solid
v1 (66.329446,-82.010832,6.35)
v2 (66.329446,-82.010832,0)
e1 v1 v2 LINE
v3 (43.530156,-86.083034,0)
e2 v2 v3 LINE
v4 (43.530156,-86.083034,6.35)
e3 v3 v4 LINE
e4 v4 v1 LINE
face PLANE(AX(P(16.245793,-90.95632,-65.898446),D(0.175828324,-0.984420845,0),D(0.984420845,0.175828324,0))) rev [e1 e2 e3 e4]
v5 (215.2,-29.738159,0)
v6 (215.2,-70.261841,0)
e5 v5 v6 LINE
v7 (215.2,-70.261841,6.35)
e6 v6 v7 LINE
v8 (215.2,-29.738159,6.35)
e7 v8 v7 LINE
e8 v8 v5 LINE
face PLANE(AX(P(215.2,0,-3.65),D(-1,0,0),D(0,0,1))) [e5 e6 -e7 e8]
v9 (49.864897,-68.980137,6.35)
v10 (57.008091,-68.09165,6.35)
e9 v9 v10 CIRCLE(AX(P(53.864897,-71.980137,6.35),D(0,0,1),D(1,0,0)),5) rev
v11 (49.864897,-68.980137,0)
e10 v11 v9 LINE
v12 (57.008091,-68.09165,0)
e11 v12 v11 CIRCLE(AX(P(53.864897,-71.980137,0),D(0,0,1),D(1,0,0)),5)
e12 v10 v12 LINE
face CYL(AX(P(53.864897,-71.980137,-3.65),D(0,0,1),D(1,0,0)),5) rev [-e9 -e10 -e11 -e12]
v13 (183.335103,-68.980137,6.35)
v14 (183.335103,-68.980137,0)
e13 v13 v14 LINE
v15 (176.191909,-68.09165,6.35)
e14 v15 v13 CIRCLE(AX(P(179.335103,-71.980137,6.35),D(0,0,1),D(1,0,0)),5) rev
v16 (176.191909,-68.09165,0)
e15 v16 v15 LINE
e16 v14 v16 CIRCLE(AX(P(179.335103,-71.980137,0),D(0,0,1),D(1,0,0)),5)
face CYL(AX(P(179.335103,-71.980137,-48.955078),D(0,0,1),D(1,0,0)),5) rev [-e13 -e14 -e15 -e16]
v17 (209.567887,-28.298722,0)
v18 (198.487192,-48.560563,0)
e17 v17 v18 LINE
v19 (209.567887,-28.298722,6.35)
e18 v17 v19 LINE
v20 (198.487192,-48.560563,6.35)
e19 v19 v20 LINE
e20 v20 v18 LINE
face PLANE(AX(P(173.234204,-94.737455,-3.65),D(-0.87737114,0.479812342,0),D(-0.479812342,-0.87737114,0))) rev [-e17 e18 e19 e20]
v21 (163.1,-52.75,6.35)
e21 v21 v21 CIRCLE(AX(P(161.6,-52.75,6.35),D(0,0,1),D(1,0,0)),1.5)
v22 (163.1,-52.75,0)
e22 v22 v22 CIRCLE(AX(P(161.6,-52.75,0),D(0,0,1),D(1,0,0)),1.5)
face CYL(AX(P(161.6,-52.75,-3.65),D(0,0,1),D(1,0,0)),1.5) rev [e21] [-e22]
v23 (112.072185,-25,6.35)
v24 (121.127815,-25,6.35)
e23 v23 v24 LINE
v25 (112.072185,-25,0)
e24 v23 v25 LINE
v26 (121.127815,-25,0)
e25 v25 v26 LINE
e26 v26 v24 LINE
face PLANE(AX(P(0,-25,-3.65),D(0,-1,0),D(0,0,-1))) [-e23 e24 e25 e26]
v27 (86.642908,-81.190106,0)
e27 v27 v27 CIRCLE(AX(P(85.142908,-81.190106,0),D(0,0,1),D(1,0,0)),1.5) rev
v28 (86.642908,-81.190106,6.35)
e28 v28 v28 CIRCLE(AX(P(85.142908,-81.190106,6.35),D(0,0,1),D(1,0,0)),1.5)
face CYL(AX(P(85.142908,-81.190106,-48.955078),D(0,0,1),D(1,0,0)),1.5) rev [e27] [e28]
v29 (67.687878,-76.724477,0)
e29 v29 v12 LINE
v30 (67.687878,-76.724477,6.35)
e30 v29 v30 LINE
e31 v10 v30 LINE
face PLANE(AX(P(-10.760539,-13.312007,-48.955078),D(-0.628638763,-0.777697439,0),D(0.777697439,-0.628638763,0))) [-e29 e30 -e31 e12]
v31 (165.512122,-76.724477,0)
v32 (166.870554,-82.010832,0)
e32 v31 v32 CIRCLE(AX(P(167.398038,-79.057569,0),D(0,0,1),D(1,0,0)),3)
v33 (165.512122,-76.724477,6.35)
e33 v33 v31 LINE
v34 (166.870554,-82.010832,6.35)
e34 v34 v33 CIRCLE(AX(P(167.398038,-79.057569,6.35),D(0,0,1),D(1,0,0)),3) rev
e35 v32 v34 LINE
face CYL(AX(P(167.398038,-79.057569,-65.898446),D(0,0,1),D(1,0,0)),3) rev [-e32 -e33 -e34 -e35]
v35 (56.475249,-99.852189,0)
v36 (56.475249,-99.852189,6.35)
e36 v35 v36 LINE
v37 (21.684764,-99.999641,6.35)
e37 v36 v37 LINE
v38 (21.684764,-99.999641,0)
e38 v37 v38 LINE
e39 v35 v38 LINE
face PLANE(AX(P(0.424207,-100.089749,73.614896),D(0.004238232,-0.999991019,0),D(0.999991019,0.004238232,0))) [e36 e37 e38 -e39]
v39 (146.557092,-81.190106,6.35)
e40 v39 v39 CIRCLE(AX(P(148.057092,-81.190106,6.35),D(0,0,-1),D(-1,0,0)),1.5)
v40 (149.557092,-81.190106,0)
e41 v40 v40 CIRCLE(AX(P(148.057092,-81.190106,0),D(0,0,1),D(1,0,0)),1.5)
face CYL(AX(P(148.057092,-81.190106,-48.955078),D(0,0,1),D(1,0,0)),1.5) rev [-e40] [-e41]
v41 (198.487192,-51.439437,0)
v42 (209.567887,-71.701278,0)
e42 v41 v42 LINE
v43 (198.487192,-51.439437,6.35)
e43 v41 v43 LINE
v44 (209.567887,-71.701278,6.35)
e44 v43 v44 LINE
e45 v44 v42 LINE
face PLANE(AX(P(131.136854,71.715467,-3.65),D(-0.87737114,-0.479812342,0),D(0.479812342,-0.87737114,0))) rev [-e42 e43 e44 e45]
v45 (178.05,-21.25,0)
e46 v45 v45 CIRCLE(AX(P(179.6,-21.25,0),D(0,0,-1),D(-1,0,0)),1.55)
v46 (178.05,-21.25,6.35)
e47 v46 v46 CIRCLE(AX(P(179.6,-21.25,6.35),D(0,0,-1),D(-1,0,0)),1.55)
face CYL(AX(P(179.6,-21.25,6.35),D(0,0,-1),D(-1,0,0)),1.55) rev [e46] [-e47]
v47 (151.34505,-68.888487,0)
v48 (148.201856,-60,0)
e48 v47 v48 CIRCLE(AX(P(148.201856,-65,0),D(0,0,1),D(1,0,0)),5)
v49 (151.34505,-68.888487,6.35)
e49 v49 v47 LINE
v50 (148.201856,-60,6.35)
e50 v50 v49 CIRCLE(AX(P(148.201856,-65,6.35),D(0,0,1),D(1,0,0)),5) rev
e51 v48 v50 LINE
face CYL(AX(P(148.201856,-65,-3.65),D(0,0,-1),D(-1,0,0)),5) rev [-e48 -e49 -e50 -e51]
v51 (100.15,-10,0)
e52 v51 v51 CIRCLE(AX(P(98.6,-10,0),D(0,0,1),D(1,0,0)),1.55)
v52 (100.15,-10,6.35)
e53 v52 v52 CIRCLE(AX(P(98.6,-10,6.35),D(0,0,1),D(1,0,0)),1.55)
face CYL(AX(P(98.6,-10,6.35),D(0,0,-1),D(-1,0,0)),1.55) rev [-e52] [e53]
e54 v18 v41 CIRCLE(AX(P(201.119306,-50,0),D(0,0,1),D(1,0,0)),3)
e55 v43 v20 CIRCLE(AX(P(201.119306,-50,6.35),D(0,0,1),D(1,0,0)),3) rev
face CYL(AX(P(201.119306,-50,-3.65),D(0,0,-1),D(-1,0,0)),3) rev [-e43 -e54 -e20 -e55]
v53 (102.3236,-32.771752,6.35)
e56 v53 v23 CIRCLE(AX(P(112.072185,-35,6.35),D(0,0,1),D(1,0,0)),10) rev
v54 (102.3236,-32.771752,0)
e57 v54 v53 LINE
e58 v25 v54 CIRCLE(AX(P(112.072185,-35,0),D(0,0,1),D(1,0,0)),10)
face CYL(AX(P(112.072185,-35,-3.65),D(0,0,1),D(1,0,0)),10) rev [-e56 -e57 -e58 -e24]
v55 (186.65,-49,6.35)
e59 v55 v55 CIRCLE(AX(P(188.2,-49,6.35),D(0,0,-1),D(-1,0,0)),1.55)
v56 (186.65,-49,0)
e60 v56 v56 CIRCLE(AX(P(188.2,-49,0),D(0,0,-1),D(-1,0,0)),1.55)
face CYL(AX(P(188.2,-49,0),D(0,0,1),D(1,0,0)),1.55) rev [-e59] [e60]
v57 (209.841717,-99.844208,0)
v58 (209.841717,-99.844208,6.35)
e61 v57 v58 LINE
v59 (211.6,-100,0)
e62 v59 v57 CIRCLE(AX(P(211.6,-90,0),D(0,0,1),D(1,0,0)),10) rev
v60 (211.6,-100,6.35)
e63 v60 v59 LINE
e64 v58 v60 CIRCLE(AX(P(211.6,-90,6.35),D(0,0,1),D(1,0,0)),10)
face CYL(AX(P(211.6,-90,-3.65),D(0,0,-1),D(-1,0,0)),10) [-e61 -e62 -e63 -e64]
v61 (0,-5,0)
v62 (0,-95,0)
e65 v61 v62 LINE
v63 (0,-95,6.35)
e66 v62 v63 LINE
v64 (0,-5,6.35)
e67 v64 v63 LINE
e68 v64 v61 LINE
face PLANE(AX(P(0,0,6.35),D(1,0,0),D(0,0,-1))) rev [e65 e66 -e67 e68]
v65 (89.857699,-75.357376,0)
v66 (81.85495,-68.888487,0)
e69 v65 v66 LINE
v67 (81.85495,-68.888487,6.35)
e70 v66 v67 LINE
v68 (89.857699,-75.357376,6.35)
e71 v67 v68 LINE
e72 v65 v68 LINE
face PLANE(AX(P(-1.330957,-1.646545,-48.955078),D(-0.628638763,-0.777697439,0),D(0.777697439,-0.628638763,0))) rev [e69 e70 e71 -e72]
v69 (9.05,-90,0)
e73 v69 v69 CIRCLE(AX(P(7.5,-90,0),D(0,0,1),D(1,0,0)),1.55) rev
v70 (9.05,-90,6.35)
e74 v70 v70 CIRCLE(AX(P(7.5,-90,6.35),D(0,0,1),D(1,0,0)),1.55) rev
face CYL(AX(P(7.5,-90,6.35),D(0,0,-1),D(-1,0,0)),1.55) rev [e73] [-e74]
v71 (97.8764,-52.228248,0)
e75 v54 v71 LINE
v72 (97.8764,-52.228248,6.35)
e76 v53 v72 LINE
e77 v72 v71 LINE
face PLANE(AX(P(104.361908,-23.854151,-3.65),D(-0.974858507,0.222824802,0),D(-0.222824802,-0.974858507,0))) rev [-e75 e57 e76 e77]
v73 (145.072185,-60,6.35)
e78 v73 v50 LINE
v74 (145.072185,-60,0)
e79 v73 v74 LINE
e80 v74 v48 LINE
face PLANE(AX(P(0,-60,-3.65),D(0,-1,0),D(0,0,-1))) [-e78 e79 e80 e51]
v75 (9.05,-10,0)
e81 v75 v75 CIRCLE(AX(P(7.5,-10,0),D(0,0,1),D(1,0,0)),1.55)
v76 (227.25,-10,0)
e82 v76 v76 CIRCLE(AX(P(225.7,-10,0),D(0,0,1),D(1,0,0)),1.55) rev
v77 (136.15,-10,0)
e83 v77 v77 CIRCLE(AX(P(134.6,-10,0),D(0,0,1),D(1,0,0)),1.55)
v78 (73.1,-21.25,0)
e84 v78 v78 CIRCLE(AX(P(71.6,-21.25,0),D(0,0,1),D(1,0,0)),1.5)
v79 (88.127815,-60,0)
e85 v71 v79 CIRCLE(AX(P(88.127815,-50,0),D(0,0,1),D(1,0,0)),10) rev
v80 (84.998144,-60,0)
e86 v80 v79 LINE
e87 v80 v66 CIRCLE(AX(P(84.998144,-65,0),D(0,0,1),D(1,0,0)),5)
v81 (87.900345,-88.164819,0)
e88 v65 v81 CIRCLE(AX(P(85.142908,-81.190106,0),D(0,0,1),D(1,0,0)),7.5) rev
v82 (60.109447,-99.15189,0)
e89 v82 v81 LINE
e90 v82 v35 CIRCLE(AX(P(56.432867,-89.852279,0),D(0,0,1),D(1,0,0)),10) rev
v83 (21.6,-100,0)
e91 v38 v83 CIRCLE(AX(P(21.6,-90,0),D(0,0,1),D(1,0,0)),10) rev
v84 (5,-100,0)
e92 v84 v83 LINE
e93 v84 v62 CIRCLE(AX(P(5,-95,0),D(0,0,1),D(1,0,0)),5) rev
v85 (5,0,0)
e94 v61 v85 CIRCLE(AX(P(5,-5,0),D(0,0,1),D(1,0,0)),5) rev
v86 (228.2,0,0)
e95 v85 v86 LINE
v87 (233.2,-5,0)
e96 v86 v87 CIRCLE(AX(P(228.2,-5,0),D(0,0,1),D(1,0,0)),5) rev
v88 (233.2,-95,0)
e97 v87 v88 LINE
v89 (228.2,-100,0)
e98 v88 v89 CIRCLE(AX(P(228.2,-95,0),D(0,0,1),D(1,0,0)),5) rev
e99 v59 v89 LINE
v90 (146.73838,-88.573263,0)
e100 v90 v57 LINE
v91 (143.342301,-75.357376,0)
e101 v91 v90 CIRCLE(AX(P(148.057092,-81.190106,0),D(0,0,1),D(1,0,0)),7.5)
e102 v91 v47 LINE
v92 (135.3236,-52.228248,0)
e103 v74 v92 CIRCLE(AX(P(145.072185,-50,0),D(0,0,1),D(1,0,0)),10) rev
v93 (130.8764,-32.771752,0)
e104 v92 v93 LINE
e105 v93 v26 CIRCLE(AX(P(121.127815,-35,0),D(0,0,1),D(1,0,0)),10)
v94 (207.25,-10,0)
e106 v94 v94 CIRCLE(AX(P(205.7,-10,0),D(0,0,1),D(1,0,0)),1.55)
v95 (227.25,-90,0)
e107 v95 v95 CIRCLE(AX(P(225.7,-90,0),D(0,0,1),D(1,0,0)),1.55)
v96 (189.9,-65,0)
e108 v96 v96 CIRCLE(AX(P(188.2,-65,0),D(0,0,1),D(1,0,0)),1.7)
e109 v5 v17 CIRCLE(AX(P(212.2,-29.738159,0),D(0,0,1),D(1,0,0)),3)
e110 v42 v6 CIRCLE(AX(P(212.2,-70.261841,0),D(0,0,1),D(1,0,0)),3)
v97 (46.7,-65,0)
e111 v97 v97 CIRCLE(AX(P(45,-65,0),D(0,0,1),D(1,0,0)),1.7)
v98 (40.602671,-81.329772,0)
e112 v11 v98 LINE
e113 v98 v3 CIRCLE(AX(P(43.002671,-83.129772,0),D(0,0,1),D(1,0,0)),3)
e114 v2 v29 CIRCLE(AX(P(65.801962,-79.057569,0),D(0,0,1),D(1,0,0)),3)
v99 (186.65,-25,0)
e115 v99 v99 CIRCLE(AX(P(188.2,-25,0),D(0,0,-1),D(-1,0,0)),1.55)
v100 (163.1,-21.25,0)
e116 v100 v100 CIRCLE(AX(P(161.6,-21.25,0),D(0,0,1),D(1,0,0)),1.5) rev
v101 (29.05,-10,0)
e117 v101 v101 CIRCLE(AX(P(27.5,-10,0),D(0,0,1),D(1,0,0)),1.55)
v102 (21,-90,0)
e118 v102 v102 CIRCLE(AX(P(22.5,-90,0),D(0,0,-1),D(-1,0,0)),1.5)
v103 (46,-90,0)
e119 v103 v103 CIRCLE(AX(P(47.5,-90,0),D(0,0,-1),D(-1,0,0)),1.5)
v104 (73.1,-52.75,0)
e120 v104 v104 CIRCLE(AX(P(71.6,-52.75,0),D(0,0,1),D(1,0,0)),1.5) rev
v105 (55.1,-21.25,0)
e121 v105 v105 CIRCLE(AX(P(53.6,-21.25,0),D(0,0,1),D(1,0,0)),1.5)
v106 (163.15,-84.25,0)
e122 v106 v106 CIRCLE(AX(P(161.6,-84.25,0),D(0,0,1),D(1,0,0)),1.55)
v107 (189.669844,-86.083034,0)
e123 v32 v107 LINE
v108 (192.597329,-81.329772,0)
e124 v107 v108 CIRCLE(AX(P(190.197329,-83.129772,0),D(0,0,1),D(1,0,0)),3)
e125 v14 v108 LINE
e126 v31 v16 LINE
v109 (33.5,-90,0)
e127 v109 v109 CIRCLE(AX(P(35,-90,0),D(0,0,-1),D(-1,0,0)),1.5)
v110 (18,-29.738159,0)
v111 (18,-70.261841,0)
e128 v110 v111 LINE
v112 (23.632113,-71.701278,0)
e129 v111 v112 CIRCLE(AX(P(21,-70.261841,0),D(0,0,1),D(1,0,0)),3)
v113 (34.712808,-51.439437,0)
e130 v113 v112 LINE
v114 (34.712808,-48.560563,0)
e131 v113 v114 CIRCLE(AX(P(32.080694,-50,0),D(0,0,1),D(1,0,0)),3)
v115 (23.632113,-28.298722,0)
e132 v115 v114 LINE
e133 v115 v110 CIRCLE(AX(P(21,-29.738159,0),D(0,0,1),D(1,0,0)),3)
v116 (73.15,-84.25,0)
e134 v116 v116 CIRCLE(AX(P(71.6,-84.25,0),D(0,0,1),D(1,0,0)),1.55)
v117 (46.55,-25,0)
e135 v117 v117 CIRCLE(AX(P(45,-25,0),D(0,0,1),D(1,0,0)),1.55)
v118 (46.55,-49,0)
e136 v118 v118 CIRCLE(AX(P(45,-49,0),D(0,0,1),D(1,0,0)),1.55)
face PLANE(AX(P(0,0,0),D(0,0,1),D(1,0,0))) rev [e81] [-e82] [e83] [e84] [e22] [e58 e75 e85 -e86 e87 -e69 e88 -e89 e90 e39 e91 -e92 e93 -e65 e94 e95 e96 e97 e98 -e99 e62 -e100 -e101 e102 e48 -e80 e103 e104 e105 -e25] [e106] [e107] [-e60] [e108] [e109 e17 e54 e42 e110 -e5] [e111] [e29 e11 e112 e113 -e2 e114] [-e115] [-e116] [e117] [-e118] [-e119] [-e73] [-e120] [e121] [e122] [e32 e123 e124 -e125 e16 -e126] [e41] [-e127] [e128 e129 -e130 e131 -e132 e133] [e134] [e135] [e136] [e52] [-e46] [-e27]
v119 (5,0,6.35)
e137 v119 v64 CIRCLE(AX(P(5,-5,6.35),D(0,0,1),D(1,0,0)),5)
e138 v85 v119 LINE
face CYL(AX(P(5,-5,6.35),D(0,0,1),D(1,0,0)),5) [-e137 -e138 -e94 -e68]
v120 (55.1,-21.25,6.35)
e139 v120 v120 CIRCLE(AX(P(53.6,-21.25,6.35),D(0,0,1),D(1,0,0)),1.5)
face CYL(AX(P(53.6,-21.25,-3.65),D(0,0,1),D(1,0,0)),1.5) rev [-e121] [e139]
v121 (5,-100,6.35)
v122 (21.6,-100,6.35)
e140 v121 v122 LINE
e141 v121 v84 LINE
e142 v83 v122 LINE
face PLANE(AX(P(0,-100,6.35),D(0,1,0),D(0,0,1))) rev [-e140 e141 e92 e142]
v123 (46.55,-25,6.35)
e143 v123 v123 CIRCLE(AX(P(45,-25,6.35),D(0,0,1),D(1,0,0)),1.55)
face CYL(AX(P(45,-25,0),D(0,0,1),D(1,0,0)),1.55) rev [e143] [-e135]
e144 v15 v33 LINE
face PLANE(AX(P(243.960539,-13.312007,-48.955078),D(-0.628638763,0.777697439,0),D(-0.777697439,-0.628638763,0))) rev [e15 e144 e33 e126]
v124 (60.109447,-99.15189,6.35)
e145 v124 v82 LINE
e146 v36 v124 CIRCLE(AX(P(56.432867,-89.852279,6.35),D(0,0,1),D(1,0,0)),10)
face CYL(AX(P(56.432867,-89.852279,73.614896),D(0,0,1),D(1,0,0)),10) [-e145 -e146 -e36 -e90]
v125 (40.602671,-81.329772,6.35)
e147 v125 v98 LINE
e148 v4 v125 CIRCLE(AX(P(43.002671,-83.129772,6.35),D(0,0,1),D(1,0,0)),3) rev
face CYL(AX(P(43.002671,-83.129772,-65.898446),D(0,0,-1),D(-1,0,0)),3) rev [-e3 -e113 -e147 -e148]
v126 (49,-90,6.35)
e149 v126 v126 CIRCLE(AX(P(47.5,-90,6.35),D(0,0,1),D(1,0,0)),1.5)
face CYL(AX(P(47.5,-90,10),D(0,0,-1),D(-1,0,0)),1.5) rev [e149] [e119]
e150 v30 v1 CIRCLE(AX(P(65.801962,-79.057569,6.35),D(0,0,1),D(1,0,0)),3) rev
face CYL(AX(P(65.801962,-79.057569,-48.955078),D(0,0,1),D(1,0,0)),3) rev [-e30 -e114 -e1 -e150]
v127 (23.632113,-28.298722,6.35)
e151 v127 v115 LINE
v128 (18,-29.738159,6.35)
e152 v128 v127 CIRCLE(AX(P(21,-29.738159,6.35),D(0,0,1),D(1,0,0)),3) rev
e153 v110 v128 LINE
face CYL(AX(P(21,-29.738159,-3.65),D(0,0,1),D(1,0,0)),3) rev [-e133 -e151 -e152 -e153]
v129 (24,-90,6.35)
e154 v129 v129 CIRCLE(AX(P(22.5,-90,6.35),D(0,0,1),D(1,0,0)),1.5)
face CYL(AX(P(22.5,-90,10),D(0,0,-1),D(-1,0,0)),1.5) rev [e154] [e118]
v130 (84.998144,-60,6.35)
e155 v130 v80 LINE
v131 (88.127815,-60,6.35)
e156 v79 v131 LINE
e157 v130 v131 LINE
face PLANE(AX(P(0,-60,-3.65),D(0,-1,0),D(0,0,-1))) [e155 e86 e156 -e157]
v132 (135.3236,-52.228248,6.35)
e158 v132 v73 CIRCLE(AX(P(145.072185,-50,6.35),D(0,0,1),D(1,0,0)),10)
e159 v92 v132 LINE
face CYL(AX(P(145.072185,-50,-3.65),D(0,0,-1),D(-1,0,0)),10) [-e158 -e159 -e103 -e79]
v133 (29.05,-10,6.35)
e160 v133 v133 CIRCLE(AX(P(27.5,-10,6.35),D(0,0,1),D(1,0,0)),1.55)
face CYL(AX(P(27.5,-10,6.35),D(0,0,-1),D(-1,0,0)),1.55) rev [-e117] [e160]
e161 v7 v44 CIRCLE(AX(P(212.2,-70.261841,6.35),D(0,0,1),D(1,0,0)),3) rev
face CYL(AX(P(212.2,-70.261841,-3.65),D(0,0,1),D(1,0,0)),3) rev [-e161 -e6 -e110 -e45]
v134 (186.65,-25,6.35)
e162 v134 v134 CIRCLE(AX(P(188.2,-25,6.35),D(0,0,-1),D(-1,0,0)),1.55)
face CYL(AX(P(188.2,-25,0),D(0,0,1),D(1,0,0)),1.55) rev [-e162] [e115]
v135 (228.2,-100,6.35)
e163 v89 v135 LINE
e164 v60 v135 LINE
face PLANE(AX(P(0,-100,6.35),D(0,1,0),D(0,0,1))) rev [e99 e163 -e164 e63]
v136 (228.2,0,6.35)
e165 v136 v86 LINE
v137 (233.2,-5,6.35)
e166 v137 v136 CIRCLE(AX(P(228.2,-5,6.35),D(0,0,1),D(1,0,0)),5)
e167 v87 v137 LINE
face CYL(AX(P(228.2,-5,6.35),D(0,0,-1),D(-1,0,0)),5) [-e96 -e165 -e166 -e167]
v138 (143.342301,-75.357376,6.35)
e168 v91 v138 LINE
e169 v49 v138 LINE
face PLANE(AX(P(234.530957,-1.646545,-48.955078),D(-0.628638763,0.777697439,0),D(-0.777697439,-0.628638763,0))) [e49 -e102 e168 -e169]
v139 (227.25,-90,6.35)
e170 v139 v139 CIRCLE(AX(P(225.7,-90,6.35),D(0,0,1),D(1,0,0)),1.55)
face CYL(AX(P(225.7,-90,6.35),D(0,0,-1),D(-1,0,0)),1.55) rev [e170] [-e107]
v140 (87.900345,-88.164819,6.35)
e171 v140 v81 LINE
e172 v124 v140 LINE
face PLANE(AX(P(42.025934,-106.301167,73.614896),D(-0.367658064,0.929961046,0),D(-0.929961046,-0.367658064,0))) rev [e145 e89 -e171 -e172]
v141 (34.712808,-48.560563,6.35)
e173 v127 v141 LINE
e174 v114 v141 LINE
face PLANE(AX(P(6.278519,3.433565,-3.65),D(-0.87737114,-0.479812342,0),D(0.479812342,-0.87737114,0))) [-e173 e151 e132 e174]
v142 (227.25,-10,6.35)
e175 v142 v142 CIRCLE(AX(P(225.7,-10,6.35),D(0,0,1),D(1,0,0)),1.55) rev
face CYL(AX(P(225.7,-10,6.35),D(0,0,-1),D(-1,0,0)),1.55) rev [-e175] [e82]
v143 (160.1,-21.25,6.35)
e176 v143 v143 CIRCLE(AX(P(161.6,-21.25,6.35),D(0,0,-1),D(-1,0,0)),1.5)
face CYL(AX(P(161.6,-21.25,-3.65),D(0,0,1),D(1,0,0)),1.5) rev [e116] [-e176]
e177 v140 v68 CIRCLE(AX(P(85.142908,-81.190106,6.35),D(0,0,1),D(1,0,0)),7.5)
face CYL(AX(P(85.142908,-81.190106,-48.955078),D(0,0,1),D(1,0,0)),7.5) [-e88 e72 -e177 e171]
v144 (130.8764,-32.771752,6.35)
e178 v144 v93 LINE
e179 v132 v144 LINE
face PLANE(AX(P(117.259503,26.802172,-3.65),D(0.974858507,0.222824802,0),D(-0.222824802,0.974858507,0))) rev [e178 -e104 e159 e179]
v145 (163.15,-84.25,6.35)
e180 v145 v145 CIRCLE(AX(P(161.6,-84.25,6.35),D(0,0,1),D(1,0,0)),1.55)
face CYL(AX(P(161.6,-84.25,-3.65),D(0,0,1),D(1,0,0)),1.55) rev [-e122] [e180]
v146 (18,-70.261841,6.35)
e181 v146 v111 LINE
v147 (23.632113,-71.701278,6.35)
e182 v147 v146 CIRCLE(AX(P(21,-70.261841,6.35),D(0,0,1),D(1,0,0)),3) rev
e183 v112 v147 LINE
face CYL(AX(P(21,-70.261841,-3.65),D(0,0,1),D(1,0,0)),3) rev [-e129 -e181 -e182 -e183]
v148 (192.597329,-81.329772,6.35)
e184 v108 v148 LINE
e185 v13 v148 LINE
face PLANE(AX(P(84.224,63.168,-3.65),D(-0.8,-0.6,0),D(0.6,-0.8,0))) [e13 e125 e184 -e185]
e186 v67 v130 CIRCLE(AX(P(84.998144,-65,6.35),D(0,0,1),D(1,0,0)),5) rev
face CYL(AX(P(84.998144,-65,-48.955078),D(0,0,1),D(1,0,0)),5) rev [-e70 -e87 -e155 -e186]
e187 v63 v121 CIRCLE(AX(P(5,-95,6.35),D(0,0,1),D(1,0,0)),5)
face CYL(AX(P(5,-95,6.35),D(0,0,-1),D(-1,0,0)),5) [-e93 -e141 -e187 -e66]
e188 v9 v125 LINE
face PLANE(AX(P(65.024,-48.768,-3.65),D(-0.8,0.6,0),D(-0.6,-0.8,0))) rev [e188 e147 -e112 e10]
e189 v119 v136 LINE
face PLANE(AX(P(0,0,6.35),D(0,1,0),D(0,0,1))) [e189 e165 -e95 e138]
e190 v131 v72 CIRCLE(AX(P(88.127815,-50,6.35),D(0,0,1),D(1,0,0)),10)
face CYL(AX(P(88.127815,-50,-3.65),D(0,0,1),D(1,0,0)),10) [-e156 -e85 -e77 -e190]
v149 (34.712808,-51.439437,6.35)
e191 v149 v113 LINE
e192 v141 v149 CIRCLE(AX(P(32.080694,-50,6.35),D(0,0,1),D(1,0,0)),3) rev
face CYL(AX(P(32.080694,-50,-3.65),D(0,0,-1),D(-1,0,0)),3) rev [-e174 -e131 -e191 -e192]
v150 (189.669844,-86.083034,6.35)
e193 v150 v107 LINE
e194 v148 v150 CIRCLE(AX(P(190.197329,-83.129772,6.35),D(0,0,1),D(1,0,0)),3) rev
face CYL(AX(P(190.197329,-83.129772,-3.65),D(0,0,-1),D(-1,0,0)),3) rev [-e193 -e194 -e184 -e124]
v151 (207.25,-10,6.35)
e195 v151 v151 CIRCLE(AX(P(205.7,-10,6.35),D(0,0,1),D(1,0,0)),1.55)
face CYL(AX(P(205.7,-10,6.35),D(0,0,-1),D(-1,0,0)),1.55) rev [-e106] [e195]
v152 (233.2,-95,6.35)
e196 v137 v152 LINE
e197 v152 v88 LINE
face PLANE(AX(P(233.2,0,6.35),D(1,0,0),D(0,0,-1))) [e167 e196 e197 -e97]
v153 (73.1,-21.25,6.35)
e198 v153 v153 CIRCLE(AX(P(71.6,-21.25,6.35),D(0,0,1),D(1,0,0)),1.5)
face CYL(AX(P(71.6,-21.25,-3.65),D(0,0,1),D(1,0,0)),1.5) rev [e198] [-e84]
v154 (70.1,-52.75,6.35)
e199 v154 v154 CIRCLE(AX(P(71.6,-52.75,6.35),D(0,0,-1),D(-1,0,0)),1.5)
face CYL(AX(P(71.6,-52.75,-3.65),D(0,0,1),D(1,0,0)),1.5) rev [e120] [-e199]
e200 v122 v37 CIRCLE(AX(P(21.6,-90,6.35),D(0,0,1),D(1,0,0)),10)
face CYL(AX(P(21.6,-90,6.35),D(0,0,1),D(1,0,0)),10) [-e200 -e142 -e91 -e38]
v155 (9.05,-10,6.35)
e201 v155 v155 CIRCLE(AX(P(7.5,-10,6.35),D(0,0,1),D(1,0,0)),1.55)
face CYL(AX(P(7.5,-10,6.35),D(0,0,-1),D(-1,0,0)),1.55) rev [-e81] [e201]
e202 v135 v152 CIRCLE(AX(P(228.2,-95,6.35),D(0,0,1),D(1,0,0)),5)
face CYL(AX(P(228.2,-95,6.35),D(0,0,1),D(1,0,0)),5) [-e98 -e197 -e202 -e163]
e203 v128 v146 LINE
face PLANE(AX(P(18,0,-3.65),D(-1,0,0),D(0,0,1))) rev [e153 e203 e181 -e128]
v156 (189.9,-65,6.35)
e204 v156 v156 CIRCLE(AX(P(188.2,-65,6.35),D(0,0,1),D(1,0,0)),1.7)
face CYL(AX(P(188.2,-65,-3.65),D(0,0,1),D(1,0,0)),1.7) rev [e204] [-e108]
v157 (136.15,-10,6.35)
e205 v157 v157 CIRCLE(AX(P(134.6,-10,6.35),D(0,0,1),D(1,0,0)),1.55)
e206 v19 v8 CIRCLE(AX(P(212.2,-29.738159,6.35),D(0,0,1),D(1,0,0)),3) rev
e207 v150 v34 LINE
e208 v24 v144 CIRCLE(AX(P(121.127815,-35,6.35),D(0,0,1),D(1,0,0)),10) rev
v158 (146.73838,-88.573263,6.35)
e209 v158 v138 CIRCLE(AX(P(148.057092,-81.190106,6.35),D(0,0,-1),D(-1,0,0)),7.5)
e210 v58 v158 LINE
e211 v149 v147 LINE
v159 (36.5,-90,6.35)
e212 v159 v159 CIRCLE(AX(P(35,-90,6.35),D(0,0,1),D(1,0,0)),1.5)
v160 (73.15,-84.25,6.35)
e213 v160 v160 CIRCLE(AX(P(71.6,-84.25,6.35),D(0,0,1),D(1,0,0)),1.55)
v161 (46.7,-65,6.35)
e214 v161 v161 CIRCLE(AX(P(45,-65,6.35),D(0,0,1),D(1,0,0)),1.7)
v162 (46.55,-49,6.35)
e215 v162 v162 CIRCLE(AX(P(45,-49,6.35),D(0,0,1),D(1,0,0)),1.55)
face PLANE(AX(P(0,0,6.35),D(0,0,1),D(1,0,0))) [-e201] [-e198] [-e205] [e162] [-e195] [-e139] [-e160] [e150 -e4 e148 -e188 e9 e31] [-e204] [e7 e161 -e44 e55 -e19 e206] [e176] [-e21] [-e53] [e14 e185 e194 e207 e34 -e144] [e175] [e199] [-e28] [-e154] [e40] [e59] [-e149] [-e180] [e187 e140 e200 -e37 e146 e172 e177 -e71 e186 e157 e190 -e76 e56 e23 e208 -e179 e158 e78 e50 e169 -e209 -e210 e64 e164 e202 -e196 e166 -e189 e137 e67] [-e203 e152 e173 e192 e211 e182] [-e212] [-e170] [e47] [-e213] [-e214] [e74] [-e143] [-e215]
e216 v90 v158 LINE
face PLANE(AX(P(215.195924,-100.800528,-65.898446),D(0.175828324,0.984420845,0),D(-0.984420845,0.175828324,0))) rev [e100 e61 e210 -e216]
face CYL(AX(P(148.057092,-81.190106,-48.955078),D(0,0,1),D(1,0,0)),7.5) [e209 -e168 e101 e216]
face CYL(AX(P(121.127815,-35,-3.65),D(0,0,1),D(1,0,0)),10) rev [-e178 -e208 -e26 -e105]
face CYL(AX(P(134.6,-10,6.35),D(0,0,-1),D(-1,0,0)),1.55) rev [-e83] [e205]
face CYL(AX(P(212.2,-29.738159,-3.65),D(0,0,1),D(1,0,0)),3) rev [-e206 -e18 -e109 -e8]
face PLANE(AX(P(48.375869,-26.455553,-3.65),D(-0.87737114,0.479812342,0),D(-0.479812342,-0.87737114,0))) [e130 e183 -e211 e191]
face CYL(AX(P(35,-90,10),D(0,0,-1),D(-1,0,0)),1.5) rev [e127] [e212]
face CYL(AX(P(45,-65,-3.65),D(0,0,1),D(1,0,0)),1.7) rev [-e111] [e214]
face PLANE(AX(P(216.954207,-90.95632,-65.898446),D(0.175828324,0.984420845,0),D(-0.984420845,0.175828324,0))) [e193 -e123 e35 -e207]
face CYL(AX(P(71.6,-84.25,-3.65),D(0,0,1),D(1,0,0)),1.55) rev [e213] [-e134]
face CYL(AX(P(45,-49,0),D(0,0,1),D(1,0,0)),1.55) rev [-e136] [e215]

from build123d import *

# Parameters (mm, degrees)
SKETCH1_W           = 233.2
SKETCH1_H           = 100
SKETCH1_R           = 1.55
BOSS_EXTRUDE1_DEPTH = 6.35
FILLET1_R           = 5
SKETCH2_R           = 1.55
CUT_EXTRUDE1_DEPTH  = 6.35
SKETCH3_W           = 10
SKETCH3_H           = 12.7
BOSS_EXTRUDE2_DEPTH = 6.35
FILLET2_R           = 5
FILLET3_R           = 10
FILLET4_R           = 2
FILLET5_R           = 20
FILLET6_R           = 5
CUT_EXTRUDE2_DEPTH  = 10
SKETCH5_W           = 120
SKETCH5_H           = 40
CUT_EXTRUDE4_DEPTH  = 10
SKETCH6_R           = 1.5
CUT_EXTRUDE5_DEPTH  = 10
FILLET7_R           = 10
SKETCH7_W           = 25
SKETCH7_H           = 35
CUT_EXTRUDE6_DEPTH  = 10
FILLET9_R           = 10
SKETCH8_R           = 1.5
CUT_EXTRUDE7_DEPTH  = 10
BOSS_EXTRUDE3_START = -6.35
BOSS_EXTRUDE3_DEPTH = 6.35
FILLET10_R          = 5
BOSS_EXTRUDE4_START = -6.35
BOSS_EXTRUDE4_DEPTH = 6.35
FILLET11_R          = 3
FILLET12_R          = 3
CUT_EXTRUDE8_DEPTH  = 10
FILLET13_R          = 3
CUT_EXTRUDE9_DEPTH  = 10
SKETCH13_R          = 1.55
CUT_EXTRUDE10_DEPTH = 10
SKETCH14_R          = 1.5
CUT_EXTRUDE11_DEPTH = 10
BOSS_EXTRUDE5_START = -6.35
BOSS_EXTRUDE5_DEPTH = 6.35
FILLET14_R          = 10
SKETCH15_R          = 1.55
CUT_EXTRUDE12_DEPTH = 254.816001269


# Read off the part's stored shape, not the designer's step: Boss-Extrude5
with BuildPart() as part:
    # Sketch1 → Boss-Extrude1 (new body)
    with BuildSketch(Plane.XY):
        with Locations((116.6, -50)):
            Rectangle(SKETCH1_W, SKETCH1_H)
        with Locations((7.5, -10)):
            Circle(SKETCH1_R, mode=Mode.SUBTRACT)
        with Locations((225.7, -10)):
            Circle(SKETCH1_R, mode=Mode.SUBTRACT)
        with Locations((7.5, -90)):
            Circle(SKETCH1_R, mode=Mode.SUBTRACT)
        with Locations((225.7, -90)):
            Circle(SKETCH1_R, mode=Mode.SUBTRACT)
        with Locations((27.5, -10)):
            Circle(SKETCH1_R, mode=Mode.SUBTRACT)
        with Locations((205.7, -10)):
            Circle(SKETCH1_R, mode=Mode.SUBTRACT)
        with Locations((134.6, -10)):
            Circle(SKETCH1_R, mode=Mode.SUBTRACT)
        with Locations((98.6, -10)):
            Circle(SKETCH1_R, mode=Mode.SUBTRACT)
    extrude(amount=BOSS_EXTRUDE1_DEPTH)

    # Fillet1
    fillet1_edges = [part.edges().sort_by_distance(p)[0] for p in [
        (233.2, -100, 3.175),
        (0, -100, 3.175),
        (0, 0, 3.175),
        (233.2, 0, 3.175),
    ]]
    fillet(fillet1_edges, radius=FILLET1_R)

    # Sketch2 → Cut-Extrude1 (cut)
    with BuildSketch(Plane.XY.offset(6.35)):
        with Locations((45, -25)):
            Circle(SKETCH2_R)
        with Locations((45, -49)):
            Circle(SKETCH2_R)
        with Locations(Location((188.2, -49, 0), (0, 0, 180))):
            Circle(SKETCH2_R)
        with Locations(Location((188.2, -25, 0), (0, 0, 180))):
            Circle(SKETCH2_R)
    extrude(amount=-CUT_EXTRUDE1_DEPTH, mode=Mode.SUBTRACT)

    # Sketch3 → Boss-Extrude2 (add)
    with BuildSketch(Plane.XY.offset(6.35)):
        with Locations((125.723568259, 6.35)):
            Rectangle(SKETCH3_W, SKETCH3_H)
        Polygon((120.723568259, 16.7), (120.723568259, 12.7), (130.723568259, 12.7), (130.723568259, 24.7), (85.723568259, 24.7), (85.723568259, 12.7), (95.723568259, 12.7), (95.723568259, 16.7), align=None)
        Polygon((130.723568259, 12.7), (130.723568259, 0), (152.313568259, 0), (130.723568259, 24.7), align=None)
    extrude(amount=-BOSS_EXTRUDE2_DEPTH)

    # Fillet2
    fillet2_edges = [part.edges().sort_by_distance(p)[0] for p in [
        (85.723568259, 12.7, 3.175),
    ]]
    fillet(fillet2_edges, radius=FILLET2_R)

    # Fillet3
    fillet3_edges = [part.edges().sort_by_distance(p)[0] for p in [
        (120.723568259, 0, 3.175),
    ]]
    fillet(fillet3_edges, radius=FILLET3_R)

    # Fillet4
    fillet4_edges = [part.edges().sort_by_distance(p)[0] for p in [
        (85.723568259, 24.7, 3.175),
    ]]
    fillet(fillet4_edges, radius=FILLET4_R)

    # Fillet5
    fillet5_edges = [part.edges().sort_by_distance(p)[0] for p in [
        (130.723568259, 24.7, 3.175),
        (152.313568259, 0, 3.175),
    ]]
    fillet(fillet5_edges, radius=FILLET5_R)

    # Fillet6
    fillet6_edges = [part.edges().sort_by_distance(p)[0] for p in [
        (120.723568259, 16.7, 3.175),
    ]]
    fillet(fillet6_edges, radius=FILLET6_R)

    # Sketch4 → Cut-Extrude2 (cut)
    with BuildSketch(Plane(origin=(0, 0, 0), x_dir=(-1, 0, 0), z_dir=(0, 0, -1))):
        with BuildLine():
            Line((-110.723568259, 0), (-161.395157905, 0))
            ThreePointArc((-161.395157905, 0), (-153.126132222, 1.789475179), (-146.33682816, 6.837678575))
            Line((-146.33682816, 6.837678575), (-136.700308357, 17.862321425))
            ThreePointArc((-136.700308357, 17.862321425), (-129.911004296, 22.910524821), (-121.641978613, 24.7))
            Line((-121.641978613, 24.7), (-87.723568259, 24.7))
            ThreePointArc((-87.723568259, 24.7), (-86.309354696, 24.114213562), (-85.723568259, 22.7))
            Line((-85.723568259, 22.7), (-85.723568259, 17.7))
            ThreePointArc((-85.723568259, 17.7), (-87.188034353, 14.164466094), (-90.723568259, 12.7))
            Line((-90.723568259, 12.7), (-95.723568259, 12.7))
            Line((-95.723568259, 12.7), (-95.723568259, 16.7))
            Line((-95.723568259, 16.7), (-115.723568259, 16.7))
            ThreePointArc((-115.723568259, 16.7), (-119.259102165, 15.235533906), (-120.723568259, 11.7))
            Line((-120.723568259, 11.7), (-120.723568259, 10))
            ThreePointArc((-120.723568259, 10), (-117.794636071, 2.928932188), (-110.723568259, 0))
        make_face()
    extrude(amount=-CUT_EXTRUDE2_DEPTH, mode=Mode.SUBTRACT)

    # Sketch5 → Cut-Extrude4 (cut)
    with BuildSketch(Plane.XY.offset(6.35)):
        Polygon((56.6, -100), (56.6, -60), (26.6, -100), align=None)
        with Locations((116.6, -80)):
            Rectangle(SKETCH5_W, SKETCH5_H)
        Polygon((206.6, -100), (176.6, -60), (176.6, -100), align=None)
    extrude(amount=-CUT_EXTRUDE4_DEPTH, mode=Mode.SUBTRACT)

    # Sketch6 → Cut-Extrude5 (cut)
    with BuildSketch(Plane.XY.offset(6.35)):
        with Locations((71.6, -21.25)):
            Circle(SKETCH6_R)
        with Locations((161.6, -21.25)):
            Circle(SKETCH6_R)
        with Locations((161.6, -52.75)):
            Circle(SKETCH6_R)
        with Locations((71.6, -52.75)):
            Circle(SKETCH6_R)
    extrude(amount=-CUT_EXTRUDE5_DEPTH, mode=Mode.SUBTRACT)

    # Fillet7
    fillet7_edges = [part.edges().sort_by_distance(p)[0] for p in [
        (206.6, -100, 3.175),
        (26.6, -100, 3.175),
        (56.6, -60, 3.175),
        (176.6, -60, 3.175),
    ]]
    fillet(fillet7_edges, radius=FILLET7_R)

    # Sketch7 → Cut-Extrude6 (cut)
    with BuildSketch(Plane.XY.offset(6.35)):
        Polygon((96.1, -60), (104.1, -60), (104.1, -25), align=None)
        Polygon((129.1, -25), (129.1, -60), (137.1, -60), align=None)
        with Locations((116.6, -42.5)):
            Rectangle(SKETCH7_W, SKETCH7_H)
    extrude(amount=-CUT_EXTRUDE6_DEPTH, mode=Mode.SUBTRACT)

    # Fillet9
    fillet9_edges = [part.edges().sort_by_distance(p)[0] for p in [
        (137.1, -60, 3.175),
        (96.1, -60, 3.175),
        (104.1, -25, 3.175),
        (129.1, -25, 3.175),
    ]]
    fillet(fillet9_edges, radius=FILLET9_R)

    # Sketch8 → Cut-Extrude7 (cut)
    with BuildSketch(Plane.XY.offset(6.35)):
        with Locations((53.6, -21.25)):
            Circle(SKETCH8_R)
    extrude(amount=-CUT_EXTRUDE7_DEPTH, mode=Mode.SUBTRACT)

    # Sketch9 → Boss-Extrude3 (add)
    with BuildSketch(Plane.XY.offset(6.35).offset(BOSS_EXTRUDE3_START)):
        with BuildLine():
            Line((53.6, -64), (52.97582451, -64.832233986))
            Line((52.97582451, -64.832233986), (80.428117061, -87.022837132))
            ThreePointArc((80.428117061, -87.022837132), (90.975638571, -85.904897064), (89.857698503, -75.357375554))
            Line((89.857698503, -75.357375554), (70.858883385, -60))
            Line((70.858883385, -60), (61.6, -60))
            ThreePointArc((61.6, -60), (57.127864045, -61.05572809), (53.6, -64))
        make_face()
        with BuildLine():
            ThreePointArc((83.976361625, -80.247148199), (85.642998156, -79.775924736), (86.642907782, -81.190106343))
            ThreePointArc((86.642907782, -81.190106343), (84.642817409, -82.60428795), (83.976361625, -80.247148199))
        make_face(mode=Mode.SUBTRACT)
    boss_extrude3 = extrude(amount=BOSS_EXTRUDE3_DEPTH)

    # Mirror1: Boss-Extrude3 across plane
    add(boss_extrude3.mirror(Plane.ZY.offset(-116.6)))

    # Fillet10
    fillet10_edges = [part.edges().sort_by_distance(p)[0] for p in [
        (52.97582451, -64.832233986, 3.175),
        (70.858883385, -60, 3.175),
        (180.22417549, -64.832233986, 3.175),
        (162.341116615, -60, 3.175),
    ]]
    fillet(fillet10_edges, radius=FILLET10_R)

    # Sketch10 → Boss-Extrude4 (add)
    with BuildSketch(Plane.XY.offset(6.35).offset(BOSS_EXTRUDE4_START)):
        with BuildLine():
            ThreePointArc((29.6, -96), (26.844092638, -98.514663376), (23.358283237, -99.844208453))
            Line((23.358283237, -99.844208453), (86.46162021, -88.573262682))
            ThreePointArc((86.46162021, -88.573262682), (83.276282006, -88.454107183), (80.428117061, -87.022837132))
            Line((80.428117061, -87.022837132), (72.798322589, -80.855419933))
            Line((72.798322589, -80.855419933), (36.033483436, -87.422022085))
            Line((36.033483436, -87.422022085), (29.6, -96))
        make_face()
    boss_extrude4 = extrude(amount=BOSS_EXTRUDE4_DEPTH)

    # Fillet11
    fillet11_edges = [part.edges().sort_by_distance(p)[0] for p in [
        (36.033483436, -87.422022085, 3.175),
        (72.798322589, -80.855419933, 3.175),
    ]]
    fillet(fillet11_edges, radius=FILLET11_R)

    # Mirror3: Boss-Extrude4 across plane
    add(boss_extrude4.mirror(Plane.ZY.offset(-116.6)))

    # Fillet12
    fillet12_edges = [part.edges().sort_by_distance(p)[0] for p in [
        (197.166516564, -87.422022085, 3.175),
        (160.401677411, -80.855419933, 3.175),
    ]]
    fillet(fillet12_edges, radius=FILLET12_R)

    # Sketch11 → Cut-Extrude8 (cut)
    with BuildSketch(Plane.XY.offset(6.35)):
        Polygon((35.5, -50), (18, -82), (18, -18), align=None)
        Polygon((215.2, -18), (215.2, -82), (197.7, -50), align=None)
    extrude(amount=-CUT_EXTRUDE8_DEPTH, mode=Mode.SUBTRACT)

    # Fillet13
    fillet13_edges = [part.edges().sort_by_distance(p)[0] for p in [
        (35.5, -50, 3.175),
        (18, -82, 3.175),
        (18, -18, 3.175),
        (215.2, -18, 3.175),
        (215.2, -82, 3.175),
        (197.7, -50, 3.175),
    ]]
    fillet(fillet13_edges, radius=FILLET13_R)

    # Sketch12 → Cut-Extrude9 (cut)
    with BuildSketch(Plane.XY.offset(6.35)):
        with BuildLine():
            ThreePointArc((186.5, -65), (188.2, -66.7), (189.9, -65))
            ThreePointArc((189.9, -65), (188.2, -63.3), (186.5, -65))
        make_face()
        with BuildLine():
            ThreePointArc((43.3, -65), (45, -66.7), (46.7, -65))
            ThreePointArc((46.7, -65), (45, -63.3), (43.3, -65))
        make_face()
    extrude(amount=-CUT_EXTRUDE9_DEPTH, mode=Mode.SUBTRACT)

    # Sketch13 → Cut-Extrude10 (cut)
    with BuildSketch(Plane.XY.offset(6.35)):
        with Locations((161.599999999, -84.25)):
            Circle(SKETCH13_R)
        with Locations((71.6, -84.25)):
            Circle(SKETCH13_R)
    extrude(amount=-CUT_EXTRUDE10_DEPTH, mode=Mode.SUBTRACT)

    # Sketch14 → Cut-Extrude11 (cut)
    with BuildSketch(Plane(origin=(0, 0, 0), x_dir=(-1, 0, 0), z_dir=(0, 0, -1))):
        with Locations((-22.5, -90)):
            Circle(SKETCH14_R)
        with Locations((-35, -90)):
            Circle(SKETCH14_R)
        with Locations((-47.5, -90)):
            Circle(SKETCH14_R)
    extrude(amount=-CUT_EXTRUDE11_DEPTH, mode=Mode.SUBTRACT)

    # Boss-Extrude5 outline → Boss-Extrude5 (add)
    with BuildSketch(Plane(origin=(0, 0, 0), x_dir=(-1, 0, 0), z_dir=(0, 0, -1)).offset(BOSS_EXTRUDE5_START)):
        with BuildLine():
            Line((-87.900343264, -88.164814191), (-58.358283237, -99.844208453))
            Line((-58.358283237, -99.844208453), (-21.684763887, -99.999640748))
            ThreePointArc((-21.684763887, -99.999640748), (-22.524794828, -99.957145902), (-23.358283237, -99.844208453))
            Line((-23.358283237, -99.844208453), (-86.46162021, -88.573262682))
            ThreePointArc((-86.46162021, -88.573262682), (-87.191188278, -88.404990057), (-87.900343264, -88.164814191))
        make_face()
    extrude(amount=BOSS_EXTRUDE5_DEPTH)

    # Fillet14
    fillet14_edges = [part.edges().sort_by_distance(p)[0] for p in [
        (58.358283237, -99.844208453, 3.175),
    ]]
    fillet(fillet14_edges, radius=FILLET14_R)

    # Sketch15 → Cut-Extrude12 (cut, through all)
    with BuildSketch(Plane(origin=(0, 0, 0), x_dir=(-1, 0, 0), z_dir=(0, 0, -1))):
        with Locations((-179.6, -21.25)):
            Circle(SKETCH15_R)
    extrude(amount=-CUT_EXTRUDE12_DEPTH, mode=Mode.SUBTRACT)


solid = part.part
